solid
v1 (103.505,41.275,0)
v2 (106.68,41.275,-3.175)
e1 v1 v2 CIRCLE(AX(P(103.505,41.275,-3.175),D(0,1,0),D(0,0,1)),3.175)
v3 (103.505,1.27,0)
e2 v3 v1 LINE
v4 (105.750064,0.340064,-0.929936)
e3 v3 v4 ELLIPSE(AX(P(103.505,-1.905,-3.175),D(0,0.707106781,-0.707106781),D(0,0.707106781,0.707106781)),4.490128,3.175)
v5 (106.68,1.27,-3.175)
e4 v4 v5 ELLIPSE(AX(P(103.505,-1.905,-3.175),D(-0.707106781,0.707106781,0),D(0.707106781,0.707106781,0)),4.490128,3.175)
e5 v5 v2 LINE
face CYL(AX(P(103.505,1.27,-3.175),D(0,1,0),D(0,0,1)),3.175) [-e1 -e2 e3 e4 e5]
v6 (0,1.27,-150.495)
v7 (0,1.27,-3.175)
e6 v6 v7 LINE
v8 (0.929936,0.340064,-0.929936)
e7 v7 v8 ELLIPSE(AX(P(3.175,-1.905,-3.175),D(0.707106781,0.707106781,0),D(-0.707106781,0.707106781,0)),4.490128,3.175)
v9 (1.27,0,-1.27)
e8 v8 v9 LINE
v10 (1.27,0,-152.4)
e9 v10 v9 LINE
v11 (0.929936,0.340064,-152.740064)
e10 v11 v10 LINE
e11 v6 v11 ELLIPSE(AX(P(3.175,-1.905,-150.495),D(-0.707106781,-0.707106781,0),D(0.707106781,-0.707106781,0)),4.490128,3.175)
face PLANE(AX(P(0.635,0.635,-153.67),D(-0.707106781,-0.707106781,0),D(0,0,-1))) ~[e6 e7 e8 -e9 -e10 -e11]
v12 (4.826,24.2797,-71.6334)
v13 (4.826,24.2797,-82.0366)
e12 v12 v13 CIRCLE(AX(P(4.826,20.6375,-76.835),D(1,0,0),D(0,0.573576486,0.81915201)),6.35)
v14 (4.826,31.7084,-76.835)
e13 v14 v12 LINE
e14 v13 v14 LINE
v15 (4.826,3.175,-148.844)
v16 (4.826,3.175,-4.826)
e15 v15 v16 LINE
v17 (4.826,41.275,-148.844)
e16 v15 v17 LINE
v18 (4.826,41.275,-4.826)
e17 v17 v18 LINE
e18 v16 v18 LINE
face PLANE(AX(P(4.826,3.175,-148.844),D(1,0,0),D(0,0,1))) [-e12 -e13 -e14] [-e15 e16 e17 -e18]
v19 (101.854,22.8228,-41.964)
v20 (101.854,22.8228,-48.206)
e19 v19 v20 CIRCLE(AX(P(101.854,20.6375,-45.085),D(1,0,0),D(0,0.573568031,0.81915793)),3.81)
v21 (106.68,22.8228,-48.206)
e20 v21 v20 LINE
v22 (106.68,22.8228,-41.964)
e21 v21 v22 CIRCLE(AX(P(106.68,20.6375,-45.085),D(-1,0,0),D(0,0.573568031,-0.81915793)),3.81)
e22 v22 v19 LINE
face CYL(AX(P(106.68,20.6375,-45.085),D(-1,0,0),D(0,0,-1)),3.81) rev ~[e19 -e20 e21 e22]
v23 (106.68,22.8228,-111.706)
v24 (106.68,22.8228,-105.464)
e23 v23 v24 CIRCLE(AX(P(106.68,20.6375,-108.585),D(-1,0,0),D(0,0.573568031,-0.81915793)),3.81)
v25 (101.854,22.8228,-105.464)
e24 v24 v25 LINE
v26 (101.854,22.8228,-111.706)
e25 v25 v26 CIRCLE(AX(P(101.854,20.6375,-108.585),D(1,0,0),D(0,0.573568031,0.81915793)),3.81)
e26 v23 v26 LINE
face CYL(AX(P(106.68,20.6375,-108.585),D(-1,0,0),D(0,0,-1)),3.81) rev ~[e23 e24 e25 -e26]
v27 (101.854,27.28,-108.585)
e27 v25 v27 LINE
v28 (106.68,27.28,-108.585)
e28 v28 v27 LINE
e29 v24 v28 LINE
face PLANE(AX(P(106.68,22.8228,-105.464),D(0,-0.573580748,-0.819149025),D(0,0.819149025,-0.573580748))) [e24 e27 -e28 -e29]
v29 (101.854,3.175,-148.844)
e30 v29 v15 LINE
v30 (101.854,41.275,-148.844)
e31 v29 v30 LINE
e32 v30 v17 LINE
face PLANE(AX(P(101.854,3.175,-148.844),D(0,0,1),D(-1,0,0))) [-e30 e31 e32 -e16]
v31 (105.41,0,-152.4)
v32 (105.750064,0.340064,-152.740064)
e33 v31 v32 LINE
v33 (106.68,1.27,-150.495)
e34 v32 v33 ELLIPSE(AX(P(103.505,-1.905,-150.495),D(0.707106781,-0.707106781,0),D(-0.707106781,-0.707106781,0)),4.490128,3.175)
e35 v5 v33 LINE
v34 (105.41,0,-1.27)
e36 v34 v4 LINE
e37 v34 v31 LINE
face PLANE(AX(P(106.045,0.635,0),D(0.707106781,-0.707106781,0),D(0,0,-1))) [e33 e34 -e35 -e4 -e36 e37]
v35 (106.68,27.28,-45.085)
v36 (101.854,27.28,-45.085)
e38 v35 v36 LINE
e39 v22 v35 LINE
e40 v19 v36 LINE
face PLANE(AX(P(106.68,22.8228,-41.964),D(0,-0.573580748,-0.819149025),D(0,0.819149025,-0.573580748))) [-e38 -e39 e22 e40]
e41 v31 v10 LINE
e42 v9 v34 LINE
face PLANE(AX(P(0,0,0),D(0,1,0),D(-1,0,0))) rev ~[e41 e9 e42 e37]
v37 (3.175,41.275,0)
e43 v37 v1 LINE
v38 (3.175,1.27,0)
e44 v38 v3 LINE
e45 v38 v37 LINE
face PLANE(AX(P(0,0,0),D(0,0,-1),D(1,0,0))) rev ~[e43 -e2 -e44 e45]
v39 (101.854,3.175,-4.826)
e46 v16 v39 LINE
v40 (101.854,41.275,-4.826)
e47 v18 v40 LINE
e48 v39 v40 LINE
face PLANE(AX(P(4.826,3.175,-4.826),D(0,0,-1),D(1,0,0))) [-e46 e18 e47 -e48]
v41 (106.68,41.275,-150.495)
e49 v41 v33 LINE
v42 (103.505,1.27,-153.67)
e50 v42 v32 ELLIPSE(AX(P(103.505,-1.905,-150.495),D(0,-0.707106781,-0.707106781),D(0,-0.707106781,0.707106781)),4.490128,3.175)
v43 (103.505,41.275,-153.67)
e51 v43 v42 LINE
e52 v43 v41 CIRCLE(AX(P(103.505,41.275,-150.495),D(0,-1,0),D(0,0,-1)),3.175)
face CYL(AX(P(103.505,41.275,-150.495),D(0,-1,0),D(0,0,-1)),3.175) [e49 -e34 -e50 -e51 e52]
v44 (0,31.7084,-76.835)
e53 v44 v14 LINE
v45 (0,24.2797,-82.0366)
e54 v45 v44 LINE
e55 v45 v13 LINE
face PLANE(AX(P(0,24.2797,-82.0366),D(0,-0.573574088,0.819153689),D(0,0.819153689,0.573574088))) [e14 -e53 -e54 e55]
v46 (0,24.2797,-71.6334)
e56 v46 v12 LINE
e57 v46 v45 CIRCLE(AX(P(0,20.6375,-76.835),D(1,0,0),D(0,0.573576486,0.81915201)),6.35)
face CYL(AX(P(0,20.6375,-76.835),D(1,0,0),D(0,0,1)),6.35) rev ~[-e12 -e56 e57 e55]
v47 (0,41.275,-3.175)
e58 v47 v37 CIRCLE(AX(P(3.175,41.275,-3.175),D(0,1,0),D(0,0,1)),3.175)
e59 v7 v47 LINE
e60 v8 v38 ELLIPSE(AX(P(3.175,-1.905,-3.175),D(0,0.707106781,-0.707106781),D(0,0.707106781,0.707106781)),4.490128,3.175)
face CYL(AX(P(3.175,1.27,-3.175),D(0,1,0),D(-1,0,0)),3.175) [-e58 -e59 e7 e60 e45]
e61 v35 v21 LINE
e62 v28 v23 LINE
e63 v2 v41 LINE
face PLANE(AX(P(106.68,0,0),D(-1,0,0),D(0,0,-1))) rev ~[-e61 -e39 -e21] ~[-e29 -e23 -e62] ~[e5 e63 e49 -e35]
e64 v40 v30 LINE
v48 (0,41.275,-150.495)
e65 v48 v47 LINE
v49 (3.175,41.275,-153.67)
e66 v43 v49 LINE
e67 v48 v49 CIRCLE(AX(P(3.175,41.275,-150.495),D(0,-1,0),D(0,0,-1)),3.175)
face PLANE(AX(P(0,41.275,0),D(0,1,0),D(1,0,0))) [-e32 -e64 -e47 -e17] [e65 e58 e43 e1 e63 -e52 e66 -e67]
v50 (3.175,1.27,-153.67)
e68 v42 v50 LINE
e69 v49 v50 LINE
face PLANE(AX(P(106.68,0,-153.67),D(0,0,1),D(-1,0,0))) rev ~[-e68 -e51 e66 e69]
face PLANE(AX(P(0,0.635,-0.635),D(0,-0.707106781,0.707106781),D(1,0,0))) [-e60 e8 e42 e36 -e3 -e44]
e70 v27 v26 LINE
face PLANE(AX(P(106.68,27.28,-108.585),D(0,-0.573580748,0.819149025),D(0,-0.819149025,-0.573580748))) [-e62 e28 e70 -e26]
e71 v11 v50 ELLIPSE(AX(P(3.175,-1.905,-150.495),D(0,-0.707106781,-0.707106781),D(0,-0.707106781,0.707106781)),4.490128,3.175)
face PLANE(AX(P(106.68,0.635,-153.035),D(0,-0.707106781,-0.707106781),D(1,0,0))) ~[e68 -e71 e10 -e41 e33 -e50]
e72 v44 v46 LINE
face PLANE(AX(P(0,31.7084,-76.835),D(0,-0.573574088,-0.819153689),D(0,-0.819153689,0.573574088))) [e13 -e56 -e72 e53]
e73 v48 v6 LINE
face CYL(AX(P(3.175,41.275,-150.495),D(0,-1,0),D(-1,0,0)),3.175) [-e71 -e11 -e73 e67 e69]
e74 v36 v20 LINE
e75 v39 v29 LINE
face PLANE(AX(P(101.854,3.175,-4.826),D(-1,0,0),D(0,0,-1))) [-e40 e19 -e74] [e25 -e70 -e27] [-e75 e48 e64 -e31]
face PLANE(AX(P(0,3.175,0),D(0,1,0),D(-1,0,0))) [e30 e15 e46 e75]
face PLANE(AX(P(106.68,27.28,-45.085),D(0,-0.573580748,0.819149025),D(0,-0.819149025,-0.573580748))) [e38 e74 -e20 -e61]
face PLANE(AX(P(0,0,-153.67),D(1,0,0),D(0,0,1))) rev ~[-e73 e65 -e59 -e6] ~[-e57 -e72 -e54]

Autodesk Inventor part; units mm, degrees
ref_plane "YZ Plane" through (0, 0, 0) normal (1, 0, 0) x (0, 1, 0)
ref_plane "XZ Plane" through (0, 0, 0) normal (0, 1, 0) x (-1, 0, 0)
ref_plane "XY Plane" through (0, 0, 0) normal (0, 0, 1) x (1, 0, 0)
sketch "Sketch3" plane through (0, 0, 0) normal (0, 1, 0) x (-1, 0, 0)
  line L0 (0, 0) -> (-106.68, 0)
  line L1 (-106.68, 0) -> (-106.68, -153.67)
  line L2 (-106.68, -153.67) -> (0, -153.67)
  line L3 (0, -153.67) -> (0, 0)
  line L4 (-15.24, -138.43) -> (-91.44, -138.43) construction
  line L5 (-91.44, -138.43) -> (-91.44, -87.63) construction
  line L6 (-91.44, -87.63) -> (-15.24, -87.63) construction
  line L7 (-15.24, -87.63) -> (-15.24, -138.43) construction
  line L8 (-15.24, -66.04) -> (-91.44, -66.04) construction
  line L9 (-91.44, -66.04) -> (-91.44, -15.24) construction
  line L10 (-91.44, -15.24) -> (-15.24, -15.24) construction
  line L11 (-15.24, -15.24) -> (-15.24, -66.04) construction
  dimension "d0" = 76.2
  dimension "d1" = 50.8
  dimension "d2" = 15.24
  dimension "d3" = 15.24
  dimension "d4" = 15.24
  dimension "d5" = 15.24
  dimension "d6" = 21.59
extrude "Extrusion1" add sketch "Sketch3" along normal blind 3.175
sketch "Sketch4" plane through (0, 3.175, 0) normal (0, 1, 0) x (1, 0, 0)
  line L0 (0, 0) -> (106.68, 0) projected
  line L1 (106.68, 0) -> (106.68, 153.67) projected
  line L2 (106.68, 153.67) -> (0, 153.67) projected
  line L3 (0, 153.67) -> (0, 0) projected
  line L4 (4.826, 4.826) -> (101.854, 4.826)
  line L5 (101.854, 4.826) -> (101.854, 148.844)
  line L6 (101.854, 148.844) -> (4.826, 148.844)
  line L7 (4.826, 148.844) -> (4.826, 4.826)
  dimension "d9" = 4.826
extrude "Extrusion2" add sketch "Sketch4" along normal blind 38.1
sketch "Sketch5" plane through (0, 3.175, 0) normal (0, 1, 0) x (1, 0, 0)
  line L0 (18.9992, 137.8966) -> (87.6808, 137.8966) construction
  line L1 (87.6808, 137.8966) -> (87.6808, 15.7734) construction
  line L2 (87.6808, 15.7734) -> (18.9992, 15.7734) construction
  line L3 (18.9992, 15.7734) -> (18.9992, 137.8966) construction
  line L4 (18.9992, 15.7734) -> (87.6808, 15.7734) construction
  line L5 (87.6808, 15.7734) -> (87.6808, 64.135) construction
  line L6 (87.6808, 64.135) -> (18.9992, 64.135) construction
  line L7 (18.9992, 64.135) -> (18.9992, 15.7734) construction
  line L8 (87.6808, 137.8966) -> (18.9992, 137.8966) construction
  line L9 (18.9992, 137.8966) -> (18.9992, 89.535) construction
  line L10 (18.9992, 89.535) -> (87.6808, 89.535) construction
  line L11 (87.6808, 89.535) -> (87.6808, 137.8966) construction
  line L12 (4.826, 148.844) -> (4.826, 4.826) construction
  line L13 (4.826, 4.826) -> (101.854, 4.826) construction
  line L14 (101.854, 4.826) -> (101.854, 148.844) construction
  line L15 (101.854, 148.844) -> (4.826, 148.844) construction
  point P0 (0, 0)
  dimension "d12" = 68.6816
  dimension "d13" = 48.3616
  dimension "d14" = 48.3616
  dimension "d15" = 14.1732
  dimension "d16" = 10.9474
  dimension "d17" = 10.9474
  dimension "d18" = 14.1732
  dimension "d19" = 25.4
sketch "Sketch6" plane through (106.68, 0, 0) normal (1, 0, 0) x (0, 0, -1)
  line L0 (45.085, 20.6375) -> (108.585, 20.6375) construction
  line L1 (0, 41.275) -> (153.67, 41.275) projected
  line L2 (0, 0) -> (153.67, 0) projected
  line L3 (0, 0) -> (0, 41.275) projected
  line L4 (153.67, 0) -> (153.67, 41.275) projected
  dimension "d20" = 20.6375
  dimension "d21" = 20.6375
  dimension "d22" = 45.085
  dimension "d23" = 45.085
  dimension "d24" = 63.5
hole "Hole1" at (106.68, 20.6375, -45.085) at (106.68, 20.6375, -108.585) direction (-1, 0, 0) diameter 7.62 end up to surface
sketch "Sketch7" plane through (0, 0, -153.67) normal (-1, 0, 0) x (0, 0, 1)
  line L0 (0, 0) -> (153.67, 0) projected
  line L1 (0, 41.275) -> (153.67, 41.275) projected
  line L2 (153.67, 0) -> (153.67, 41.275) projected
  line L3 (0, 0) -> (0, 41.275) projected
  point P0 (76.835, 20.6375)
  dimension "d32" = 20.6375
  dimension "d33" = 20.6375
  dimension "d34" = 76.835
  dimension "d35" = 76.835
hole "Hole2" at (0, 20.6375, -76.835) direction (1, 0, 0) diameter 12.7 end up to surface
chamfer "Chamfer1" distance 1.27 angle 45 4 edges at (106.68, 0, -76.835) (53.34, 0, -153.67) (0, 0, -76.835) (53.34, 0, 0)
fillet "Fillet1" radius 3.175 4 edges at (106.68, 21.2725, -153.67) (106.68, 21.2725, 0) (0, 21.2725, 0) (0, 21.2725, -153.67)
sketch "Sketch8" plane through (0, 1.27, -150.495) normal (-1, 0, 0) x (0, 0, 1)
  circle A0 centre (73.66, 19.3675) radius 6.35 construction
  line L0 (68.4584, 23.0097) -> (73.66, 30.4384)
  line L1 (73.66, 30.4384) -> (78.8616, 23.0097)
  line L2 (73.66, 19.3675) -> (73.66, 30.4384) construction
  line L3 (68.4584, 23.0097) -> (78.8616, 23.0097) construction
  arc A1 (78.8616, 23.0097) -> (68.4584, 23.0097) centre (73.66, 19.3675) ccw
  point P0 (150.495, -1.27)
  dimension "d47" = 55
extrude "Extrusion3" cut sketch "Sketch8" against normal up to surface (4.826 mm away)
sketch "Sketch9" plane through (106.68, 1.27, -3.175) normal (1, 0, 0) x (0, 0, -1)
  circle A0 centre (41.91, 19.3675) radius 3.81 construction
  circle A1 centre (105.41, 19.3675) radius 3.81 construction
  line L0 (0, 0) -> (0, 40.005) construction
  line L1 (147.32, 0) -> (0, 0) construction
  line L2 (147.32, 40.005) -> (147.32, 0) construction
  line L3 (0, 40.005) -> (147.32, 40.005) construction
  line L4 (38.789, 21.5528) -> (41.91, 26.01)
  line L5 (41.91, 26.01) -> (45.031, 21.5528)
  line L6 (102.289, 21.5528) -> (105.41, 26.01)
  line L7 (105.41, 26.01) -> (108.531, 21.5528)
  circle A2 centre (41.91, 19.3675) radius 3.81 projected
  circle A3 centre (105.41, 19.3675) radius 3.81 projected
  line L8 (41.91, 19.3675) -> (41.91, 26.01) construction
  line L9 (105.41, 19.3675) -> (105.41, 26.01) construction
  line L10 (38.789, 21.5528) -> (45.031, 21.5528) construction
  point P0 (-3.175, -1.27)
  dimension "d50" = 55
extrude "Extrusion4" cut sketch "Sketch9" against normal up to surface (4.826 mm away) contours L4 L5 A2 | L6 L7 A3
equation "\"d3\" = d2"
equation "\"d4\" = d2"
equation "\"d5\" = d3"
equation "\"d17\" = d16"
equation "\"d18\" = d15"
equation "\"d20\" = d21"
equation "\"d23\" = d22"
equation "\"d32\" = d33"
equation "\"d34\" = d35"
properties part number "bottom"
